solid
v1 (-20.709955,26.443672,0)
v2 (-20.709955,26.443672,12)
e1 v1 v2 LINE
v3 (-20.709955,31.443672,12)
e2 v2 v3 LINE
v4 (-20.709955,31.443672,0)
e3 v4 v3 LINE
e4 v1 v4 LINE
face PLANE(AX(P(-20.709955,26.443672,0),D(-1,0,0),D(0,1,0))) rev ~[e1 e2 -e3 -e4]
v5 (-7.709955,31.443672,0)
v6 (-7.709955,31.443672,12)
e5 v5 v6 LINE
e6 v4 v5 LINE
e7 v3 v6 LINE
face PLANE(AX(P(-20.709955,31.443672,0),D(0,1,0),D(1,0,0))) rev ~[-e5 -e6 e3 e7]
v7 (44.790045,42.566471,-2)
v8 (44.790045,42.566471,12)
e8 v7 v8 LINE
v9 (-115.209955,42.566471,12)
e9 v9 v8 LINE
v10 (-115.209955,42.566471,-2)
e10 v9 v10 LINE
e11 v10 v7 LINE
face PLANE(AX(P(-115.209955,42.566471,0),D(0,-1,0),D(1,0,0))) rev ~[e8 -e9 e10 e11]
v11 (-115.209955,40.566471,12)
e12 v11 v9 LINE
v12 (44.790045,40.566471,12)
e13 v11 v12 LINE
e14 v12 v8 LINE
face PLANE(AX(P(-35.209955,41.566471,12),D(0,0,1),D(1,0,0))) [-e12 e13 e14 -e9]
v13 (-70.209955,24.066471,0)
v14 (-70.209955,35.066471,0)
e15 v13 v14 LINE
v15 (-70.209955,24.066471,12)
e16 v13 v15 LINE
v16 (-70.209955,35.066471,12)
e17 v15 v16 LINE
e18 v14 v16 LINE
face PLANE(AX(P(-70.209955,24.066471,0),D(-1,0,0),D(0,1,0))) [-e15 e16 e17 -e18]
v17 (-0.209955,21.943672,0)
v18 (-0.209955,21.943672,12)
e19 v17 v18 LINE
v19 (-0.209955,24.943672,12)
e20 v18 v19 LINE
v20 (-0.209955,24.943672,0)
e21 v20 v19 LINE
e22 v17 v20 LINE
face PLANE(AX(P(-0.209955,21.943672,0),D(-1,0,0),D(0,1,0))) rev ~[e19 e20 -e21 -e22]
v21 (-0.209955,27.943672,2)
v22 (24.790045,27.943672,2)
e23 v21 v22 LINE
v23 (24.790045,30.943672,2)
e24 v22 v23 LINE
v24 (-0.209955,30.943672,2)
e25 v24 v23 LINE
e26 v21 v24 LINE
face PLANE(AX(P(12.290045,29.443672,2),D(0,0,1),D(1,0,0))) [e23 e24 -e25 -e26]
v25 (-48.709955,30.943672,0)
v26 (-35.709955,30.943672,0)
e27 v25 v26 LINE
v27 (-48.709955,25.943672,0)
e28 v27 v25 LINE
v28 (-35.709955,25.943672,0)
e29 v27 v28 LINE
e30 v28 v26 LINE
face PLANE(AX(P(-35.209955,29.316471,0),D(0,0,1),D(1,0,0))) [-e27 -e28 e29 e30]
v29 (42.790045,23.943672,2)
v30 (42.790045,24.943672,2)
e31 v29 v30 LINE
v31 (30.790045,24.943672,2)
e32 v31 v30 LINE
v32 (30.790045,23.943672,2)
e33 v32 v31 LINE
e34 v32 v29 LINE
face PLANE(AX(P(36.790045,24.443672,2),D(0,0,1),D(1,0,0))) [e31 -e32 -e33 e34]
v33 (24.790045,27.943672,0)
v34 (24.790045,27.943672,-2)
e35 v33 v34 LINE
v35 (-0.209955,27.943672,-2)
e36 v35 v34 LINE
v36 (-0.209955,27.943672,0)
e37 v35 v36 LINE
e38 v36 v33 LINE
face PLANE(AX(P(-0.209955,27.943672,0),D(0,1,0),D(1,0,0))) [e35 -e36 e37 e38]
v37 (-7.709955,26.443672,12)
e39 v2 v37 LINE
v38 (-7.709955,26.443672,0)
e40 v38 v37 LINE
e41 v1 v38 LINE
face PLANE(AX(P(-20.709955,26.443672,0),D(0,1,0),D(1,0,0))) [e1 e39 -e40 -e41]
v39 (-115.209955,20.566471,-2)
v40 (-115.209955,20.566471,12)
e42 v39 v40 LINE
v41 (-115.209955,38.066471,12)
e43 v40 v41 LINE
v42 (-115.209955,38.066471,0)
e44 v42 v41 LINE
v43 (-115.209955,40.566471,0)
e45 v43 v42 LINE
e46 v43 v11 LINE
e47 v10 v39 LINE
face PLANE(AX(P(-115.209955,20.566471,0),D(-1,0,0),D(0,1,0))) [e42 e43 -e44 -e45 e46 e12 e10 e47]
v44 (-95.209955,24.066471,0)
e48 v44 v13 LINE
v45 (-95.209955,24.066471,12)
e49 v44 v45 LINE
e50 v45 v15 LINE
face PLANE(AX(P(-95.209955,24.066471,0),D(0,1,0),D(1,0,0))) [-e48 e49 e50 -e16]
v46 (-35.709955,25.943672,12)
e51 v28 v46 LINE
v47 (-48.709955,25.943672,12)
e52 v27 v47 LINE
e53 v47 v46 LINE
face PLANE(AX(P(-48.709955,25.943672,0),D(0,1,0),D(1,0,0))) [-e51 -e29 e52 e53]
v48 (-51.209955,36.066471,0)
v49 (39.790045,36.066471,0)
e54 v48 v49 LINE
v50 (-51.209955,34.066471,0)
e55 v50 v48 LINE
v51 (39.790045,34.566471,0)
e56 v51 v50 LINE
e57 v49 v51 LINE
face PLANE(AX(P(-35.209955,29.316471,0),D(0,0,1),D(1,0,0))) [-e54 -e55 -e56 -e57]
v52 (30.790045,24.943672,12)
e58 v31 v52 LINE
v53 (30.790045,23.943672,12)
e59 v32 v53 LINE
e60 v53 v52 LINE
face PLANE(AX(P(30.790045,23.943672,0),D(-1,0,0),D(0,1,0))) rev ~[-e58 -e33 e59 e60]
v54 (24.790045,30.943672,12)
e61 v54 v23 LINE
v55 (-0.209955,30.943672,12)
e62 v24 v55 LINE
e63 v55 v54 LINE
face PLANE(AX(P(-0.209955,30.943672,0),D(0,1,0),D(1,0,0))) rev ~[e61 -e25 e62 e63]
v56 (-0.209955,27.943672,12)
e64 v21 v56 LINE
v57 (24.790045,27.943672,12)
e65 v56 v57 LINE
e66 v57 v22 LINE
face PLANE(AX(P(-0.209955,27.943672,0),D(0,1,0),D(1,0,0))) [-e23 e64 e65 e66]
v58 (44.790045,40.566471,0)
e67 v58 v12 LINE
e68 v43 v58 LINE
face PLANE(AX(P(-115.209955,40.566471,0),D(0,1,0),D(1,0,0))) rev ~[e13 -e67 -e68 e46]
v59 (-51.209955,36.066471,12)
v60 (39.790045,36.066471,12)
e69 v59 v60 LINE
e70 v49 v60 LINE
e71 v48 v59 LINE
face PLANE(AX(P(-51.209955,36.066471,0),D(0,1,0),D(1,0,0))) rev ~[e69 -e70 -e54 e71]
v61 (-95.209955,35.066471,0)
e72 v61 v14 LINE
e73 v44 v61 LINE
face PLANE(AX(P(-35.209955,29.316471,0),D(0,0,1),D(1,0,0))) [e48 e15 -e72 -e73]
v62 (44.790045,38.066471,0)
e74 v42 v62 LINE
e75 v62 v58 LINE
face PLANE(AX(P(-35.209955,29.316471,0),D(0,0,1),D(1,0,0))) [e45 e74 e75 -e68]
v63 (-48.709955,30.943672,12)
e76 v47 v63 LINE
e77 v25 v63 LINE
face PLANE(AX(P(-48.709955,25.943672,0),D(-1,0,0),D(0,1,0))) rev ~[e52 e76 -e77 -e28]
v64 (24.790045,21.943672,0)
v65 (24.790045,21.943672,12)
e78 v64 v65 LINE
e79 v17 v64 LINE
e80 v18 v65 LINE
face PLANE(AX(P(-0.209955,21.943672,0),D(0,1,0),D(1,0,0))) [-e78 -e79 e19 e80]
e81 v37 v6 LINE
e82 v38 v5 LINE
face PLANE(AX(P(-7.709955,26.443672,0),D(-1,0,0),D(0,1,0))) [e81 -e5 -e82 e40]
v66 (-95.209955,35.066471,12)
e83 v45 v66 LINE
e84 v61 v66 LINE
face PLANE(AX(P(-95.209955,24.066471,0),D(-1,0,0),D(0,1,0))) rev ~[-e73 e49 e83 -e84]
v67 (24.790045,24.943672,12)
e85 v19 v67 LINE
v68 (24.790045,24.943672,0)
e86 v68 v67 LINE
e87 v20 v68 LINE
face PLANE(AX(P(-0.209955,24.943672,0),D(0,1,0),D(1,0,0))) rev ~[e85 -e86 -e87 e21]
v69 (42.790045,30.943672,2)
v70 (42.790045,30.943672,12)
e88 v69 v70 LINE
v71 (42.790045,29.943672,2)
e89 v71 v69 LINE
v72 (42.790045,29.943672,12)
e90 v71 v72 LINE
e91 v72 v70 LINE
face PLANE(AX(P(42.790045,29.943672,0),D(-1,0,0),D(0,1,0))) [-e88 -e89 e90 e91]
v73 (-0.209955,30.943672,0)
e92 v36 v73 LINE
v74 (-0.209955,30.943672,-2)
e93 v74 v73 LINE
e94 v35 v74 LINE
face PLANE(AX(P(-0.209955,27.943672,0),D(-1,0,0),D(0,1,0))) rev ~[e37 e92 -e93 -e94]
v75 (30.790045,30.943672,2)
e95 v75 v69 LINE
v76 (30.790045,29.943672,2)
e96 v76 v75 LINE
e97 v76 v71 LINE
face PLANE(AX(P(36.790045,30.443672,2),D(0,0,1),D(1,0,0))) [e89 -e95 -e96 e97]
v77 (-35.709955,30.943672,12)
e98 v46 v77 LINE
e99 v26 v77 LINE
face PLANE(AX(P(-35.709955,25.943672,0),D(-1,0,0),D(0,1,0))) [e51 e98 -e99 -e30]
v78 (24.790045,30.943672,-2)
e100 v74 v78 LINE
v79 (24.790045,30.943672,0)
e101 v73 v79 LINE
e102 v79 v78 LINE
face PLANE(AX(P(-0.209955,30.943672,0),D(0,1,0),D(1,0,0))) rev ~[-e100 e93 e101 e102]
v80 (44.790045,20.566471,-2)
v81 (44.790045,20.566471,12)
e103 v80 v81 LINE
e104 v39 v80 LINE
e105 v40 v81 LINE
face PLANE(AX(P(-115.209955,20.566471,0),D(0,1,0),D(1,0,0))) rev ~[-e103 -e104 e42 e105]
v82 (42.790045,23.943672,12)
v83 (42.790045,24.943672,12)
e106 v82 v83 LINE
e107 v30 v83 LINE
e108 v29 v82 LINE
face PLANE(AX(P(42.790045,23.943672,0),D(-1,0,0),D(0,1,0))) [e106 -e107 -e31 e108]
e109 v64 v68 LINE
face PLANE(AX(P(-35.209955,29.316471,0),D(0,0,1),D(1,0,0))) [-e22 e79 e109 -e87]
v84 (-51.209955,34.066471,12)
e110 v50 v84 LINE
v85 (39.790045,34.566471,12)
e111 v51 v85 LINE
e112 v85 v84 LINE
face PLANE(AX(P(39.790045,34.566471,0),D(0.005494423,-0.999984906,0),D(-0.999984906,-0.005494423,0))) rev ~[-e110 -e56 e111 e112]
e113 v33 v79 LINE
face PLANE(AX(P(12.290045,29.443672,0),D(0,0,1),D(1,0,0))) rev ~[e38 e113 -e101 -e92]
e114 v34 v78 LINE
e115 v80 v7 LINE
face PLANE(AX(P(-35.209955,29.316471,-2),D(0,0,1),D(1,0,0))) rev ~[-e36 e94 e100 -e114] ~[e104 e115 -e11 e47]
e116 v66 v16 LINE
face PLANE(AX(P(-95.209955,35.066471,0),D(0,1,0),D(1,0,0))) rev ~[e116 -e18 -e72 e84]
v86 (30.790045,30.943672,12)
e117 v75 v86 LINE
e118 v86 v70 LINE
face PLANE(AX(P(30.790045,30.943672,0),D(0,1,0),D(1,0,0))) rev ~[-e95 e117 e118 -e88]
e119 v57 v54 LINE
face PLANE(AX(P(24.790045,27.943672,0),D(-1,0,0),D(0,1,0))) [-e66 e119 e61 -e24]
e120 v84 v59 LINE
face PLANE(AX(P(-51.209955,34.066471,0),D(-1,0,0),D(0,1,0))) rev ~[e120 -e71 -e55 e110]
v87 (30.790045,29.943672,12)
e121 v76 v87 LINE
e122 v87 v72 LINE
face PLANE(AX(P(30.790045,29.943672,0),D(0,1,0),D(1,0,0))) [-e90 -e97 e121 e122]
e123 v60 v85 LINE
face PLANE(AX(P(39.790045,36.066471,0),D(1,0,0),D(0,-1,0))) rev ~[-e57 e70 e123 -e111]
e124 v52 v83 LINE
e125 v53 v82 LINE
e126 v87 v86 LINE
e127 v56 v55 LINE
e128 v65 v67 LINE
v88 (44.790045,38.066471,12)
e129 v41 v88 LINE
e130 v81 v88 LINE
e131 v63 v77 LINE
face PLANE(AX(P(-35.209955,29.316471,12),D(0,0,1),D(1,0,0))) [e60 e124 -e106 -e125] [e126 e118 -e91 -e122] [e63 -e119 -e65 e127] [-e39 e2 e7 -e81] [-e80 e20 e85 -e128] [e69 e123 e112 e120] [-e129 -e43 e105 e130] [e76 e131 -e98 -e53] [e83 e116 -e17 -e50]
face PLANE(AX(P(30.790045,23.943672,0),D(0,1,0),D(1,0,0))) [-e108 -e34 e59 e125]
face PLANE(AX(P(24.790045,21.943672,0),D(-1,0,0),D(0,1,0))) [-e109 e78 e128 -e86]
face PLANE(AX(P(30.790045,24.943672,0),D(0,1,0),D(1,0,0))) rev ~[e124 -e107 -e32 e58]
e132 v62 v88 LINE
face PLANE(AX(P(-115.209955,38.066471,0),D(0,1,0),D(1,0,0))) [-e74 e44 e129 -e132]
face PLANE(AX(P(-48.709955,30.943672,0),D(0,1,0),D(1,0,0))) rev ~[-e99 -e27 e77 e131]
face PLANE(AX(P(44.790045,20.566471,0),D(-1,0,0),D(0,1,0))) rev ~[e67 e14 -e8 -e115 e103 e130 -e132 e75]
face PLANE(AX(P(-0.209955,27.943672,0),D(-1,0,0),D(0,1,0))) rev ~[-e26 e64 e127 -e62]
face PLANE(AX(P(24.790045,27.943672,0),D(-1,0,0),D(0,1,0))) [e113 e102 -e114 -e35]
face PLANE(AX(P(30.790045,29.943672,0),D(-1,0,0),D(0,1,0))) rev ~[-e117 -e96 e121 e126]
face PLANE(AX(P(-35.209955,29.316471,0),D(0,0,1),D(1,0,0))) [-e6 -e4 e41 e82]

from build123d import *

# Parameters (mm, degrees)
F0_W     = 160
F0_H     = 17.5
F0_W_2   = 25
F0_H_2   = 11
F0_W_3   = 13
F0_H_3   = 5
F0_H_4   = 3
F0_W_4   = 12
F0_H_5   = 1
F0_H_6   = 2.5
F0_H_7   = 2
F1_DEPTH = 2
F2_DEPTH = 12
F3_DEPTH = 2
F4_DEPTH = 2


# Not quite as in the source:
# - a feature names something its author has since deleted; it is built from what else it names


with BuildPart() as f1:
    # F0 (on Top) → F1 (new body)
    with BuildSketch(Plane.XY):
        with Locations((-35.2099549949, 29.3164705649)):
            Rectangle(F0_W, F0_H)
        with Locations((-82.7099549949, 29.5664705649)):
            Rectangle(F0_W_2, F0_H_2, mode=Mode.SUBTRACT)
        with Locations((-42.2099549949, 28.443671599)):
            Rectangle(F0_W_3, F0_H_3, mode=Mode.SUBTRACT)
        with Locations((12.2900450051, 23.443671599)):
            Rectangle(F0_W_2, F0_H_4, mode=Mode.SUBTRACT)
        with Locations((36.7900450051, 24.443671599)):
            Rectangle(F0_W_4, F0_H_5, mode=Mode.SUBTRACT)
        with Locations((-14.2099549949, 28.943671599)):
            Rectangle(F0_W_3, F0_H_3, mode=Mode.SUBTRACT)
        with Locations((12.2900450051, 29.443671599)):
            Rectangle(F0_W_2, F0_H_4, mode=Mode.SUBTRACT)
        with Locations((36.7900450051, 30.443671599)):
            Rectangle(F0_W_4, F0_H_5, mode=Mode.SUBTRACT)
        Polygon((-51.2099549949, 36.0664705649), (39.7900450051, 36.0664705649), (39.7900450051, 34.5664705649), (-51.2099549949, 34.0664705649), align=None, mode=Mode.SUBTRACT)
        with Locations((-35.2099549949, 39.3164705649)):
            Rectangle(F0_W, F0_H_6)
        with Locations((-35.2099549949, 41.5664705649)):
            Rectangle(F0_W, F0_H_7)
        with Locations((-82.7099549949, 29.5664705649)):
            Rectangle(F0_W_2, F0_H_2)
        Polygon((39.7900450051, 34.5664705649), (39.7900450051, 36.0664705649), (-51.2099549949, 36.0664705649), (-51.2099549949, 34.0664705649), align=None)
        with Locations((12.2900450051, 23.443671599)):
            Rectangle(F0_W_2, F0_H_4)
        with Locations((-42.2099549949, 28.443671599)):
            Rectangle(F0_W_3, F0_H_3)
        with Locations((-14.2099549949, 28.943671599)):
            Rectangle(F0_W_3, F0_H_3)
        with Locations((36.7900450051, 24.443671599)):
            Rectangle(F0_W_4, F0_H_5)
        with Locations((36.7900450051, 30.443671599)):
            Rectangle(F0_W_4, F0_H_5)
    extrude(amount=-F1_DEPTH)

    # F0 (on Top) → F2 (join)
    with BuildSketch(Plane.XY):
        with Locations((-35.2099549949, 29.3164705649)):
            Rectangle(F0_W, F0_H)
        with Locations((-82.7099549949, 29.5664705649)):
            Rectangle(F0_W_2, F0_H_2, mode=Mode.SUBTRACT)
        with Locations((-42.2099549949, 28.443671599)):
            Rectangle(F0_W_3, F0_H_3, mode=Mode.SUBTRACT)
        with Locations((12.2900450051, 23.443671599)):
            Rectangle(F0_W_2, F0_H_4, mode=Mode.SUBTRACT)
        with Locations((36.7900450051, 24.443671599)):
            Rectangle(F0_W_4, F0_H_5, mode=Mode.SUBTRACT)
        with Locations((-14.2099549949, 28.943671599)):
            Rectangle(F0_W_3, F0_H_3, mode=Mode.SUBTRACT)
        with Locations((12.2900450051, 29.443671599)):
            Rectangle(F0_W_2, F0_H_4, mode=Mode.SUBTRACT)
        with Locations((36.7900450051, 30.443671599)):
            Rectangle(F0_W_4, F0_H_5, mode=Mode.SUBTRACT)
        Polygon((-51.2099549949, 36.0664705649), (39.7900450051, 36.0664705649), (39.7900450051, 34.5664705649), (-51.2099549949, 34.0664705649), align=None, mode=Mode.SUBTRACT)
        with Locations((-35.2099549949, 41.5664705649)):
            Rectangle(F0_W, F0_H_7)
    extrude(amount=F2_DEPTH)

    # F0 (on Top) → F3 (join)
    with BuildSketch(Plane.XY):
        with Locations((36.7900450051, 30.443671599)):
            Rectangle(F0_W_4, F0_H_5)
        with Locations((36.7900450051, 24.443671599)):
            Rectangle(F0_W_4, F0_H_5)
    extrude(amount=F3_DEPTH)

    # F0 (on Top) → F4 (join)
    with BuildSketch(Plane.XY):
        with Locations((12.2900450051, 29.443671599)):
            Rectangle(F0_W_2, F0_H_4)
    extrude(amount=F4_DEPTH)


solid = f1.part
